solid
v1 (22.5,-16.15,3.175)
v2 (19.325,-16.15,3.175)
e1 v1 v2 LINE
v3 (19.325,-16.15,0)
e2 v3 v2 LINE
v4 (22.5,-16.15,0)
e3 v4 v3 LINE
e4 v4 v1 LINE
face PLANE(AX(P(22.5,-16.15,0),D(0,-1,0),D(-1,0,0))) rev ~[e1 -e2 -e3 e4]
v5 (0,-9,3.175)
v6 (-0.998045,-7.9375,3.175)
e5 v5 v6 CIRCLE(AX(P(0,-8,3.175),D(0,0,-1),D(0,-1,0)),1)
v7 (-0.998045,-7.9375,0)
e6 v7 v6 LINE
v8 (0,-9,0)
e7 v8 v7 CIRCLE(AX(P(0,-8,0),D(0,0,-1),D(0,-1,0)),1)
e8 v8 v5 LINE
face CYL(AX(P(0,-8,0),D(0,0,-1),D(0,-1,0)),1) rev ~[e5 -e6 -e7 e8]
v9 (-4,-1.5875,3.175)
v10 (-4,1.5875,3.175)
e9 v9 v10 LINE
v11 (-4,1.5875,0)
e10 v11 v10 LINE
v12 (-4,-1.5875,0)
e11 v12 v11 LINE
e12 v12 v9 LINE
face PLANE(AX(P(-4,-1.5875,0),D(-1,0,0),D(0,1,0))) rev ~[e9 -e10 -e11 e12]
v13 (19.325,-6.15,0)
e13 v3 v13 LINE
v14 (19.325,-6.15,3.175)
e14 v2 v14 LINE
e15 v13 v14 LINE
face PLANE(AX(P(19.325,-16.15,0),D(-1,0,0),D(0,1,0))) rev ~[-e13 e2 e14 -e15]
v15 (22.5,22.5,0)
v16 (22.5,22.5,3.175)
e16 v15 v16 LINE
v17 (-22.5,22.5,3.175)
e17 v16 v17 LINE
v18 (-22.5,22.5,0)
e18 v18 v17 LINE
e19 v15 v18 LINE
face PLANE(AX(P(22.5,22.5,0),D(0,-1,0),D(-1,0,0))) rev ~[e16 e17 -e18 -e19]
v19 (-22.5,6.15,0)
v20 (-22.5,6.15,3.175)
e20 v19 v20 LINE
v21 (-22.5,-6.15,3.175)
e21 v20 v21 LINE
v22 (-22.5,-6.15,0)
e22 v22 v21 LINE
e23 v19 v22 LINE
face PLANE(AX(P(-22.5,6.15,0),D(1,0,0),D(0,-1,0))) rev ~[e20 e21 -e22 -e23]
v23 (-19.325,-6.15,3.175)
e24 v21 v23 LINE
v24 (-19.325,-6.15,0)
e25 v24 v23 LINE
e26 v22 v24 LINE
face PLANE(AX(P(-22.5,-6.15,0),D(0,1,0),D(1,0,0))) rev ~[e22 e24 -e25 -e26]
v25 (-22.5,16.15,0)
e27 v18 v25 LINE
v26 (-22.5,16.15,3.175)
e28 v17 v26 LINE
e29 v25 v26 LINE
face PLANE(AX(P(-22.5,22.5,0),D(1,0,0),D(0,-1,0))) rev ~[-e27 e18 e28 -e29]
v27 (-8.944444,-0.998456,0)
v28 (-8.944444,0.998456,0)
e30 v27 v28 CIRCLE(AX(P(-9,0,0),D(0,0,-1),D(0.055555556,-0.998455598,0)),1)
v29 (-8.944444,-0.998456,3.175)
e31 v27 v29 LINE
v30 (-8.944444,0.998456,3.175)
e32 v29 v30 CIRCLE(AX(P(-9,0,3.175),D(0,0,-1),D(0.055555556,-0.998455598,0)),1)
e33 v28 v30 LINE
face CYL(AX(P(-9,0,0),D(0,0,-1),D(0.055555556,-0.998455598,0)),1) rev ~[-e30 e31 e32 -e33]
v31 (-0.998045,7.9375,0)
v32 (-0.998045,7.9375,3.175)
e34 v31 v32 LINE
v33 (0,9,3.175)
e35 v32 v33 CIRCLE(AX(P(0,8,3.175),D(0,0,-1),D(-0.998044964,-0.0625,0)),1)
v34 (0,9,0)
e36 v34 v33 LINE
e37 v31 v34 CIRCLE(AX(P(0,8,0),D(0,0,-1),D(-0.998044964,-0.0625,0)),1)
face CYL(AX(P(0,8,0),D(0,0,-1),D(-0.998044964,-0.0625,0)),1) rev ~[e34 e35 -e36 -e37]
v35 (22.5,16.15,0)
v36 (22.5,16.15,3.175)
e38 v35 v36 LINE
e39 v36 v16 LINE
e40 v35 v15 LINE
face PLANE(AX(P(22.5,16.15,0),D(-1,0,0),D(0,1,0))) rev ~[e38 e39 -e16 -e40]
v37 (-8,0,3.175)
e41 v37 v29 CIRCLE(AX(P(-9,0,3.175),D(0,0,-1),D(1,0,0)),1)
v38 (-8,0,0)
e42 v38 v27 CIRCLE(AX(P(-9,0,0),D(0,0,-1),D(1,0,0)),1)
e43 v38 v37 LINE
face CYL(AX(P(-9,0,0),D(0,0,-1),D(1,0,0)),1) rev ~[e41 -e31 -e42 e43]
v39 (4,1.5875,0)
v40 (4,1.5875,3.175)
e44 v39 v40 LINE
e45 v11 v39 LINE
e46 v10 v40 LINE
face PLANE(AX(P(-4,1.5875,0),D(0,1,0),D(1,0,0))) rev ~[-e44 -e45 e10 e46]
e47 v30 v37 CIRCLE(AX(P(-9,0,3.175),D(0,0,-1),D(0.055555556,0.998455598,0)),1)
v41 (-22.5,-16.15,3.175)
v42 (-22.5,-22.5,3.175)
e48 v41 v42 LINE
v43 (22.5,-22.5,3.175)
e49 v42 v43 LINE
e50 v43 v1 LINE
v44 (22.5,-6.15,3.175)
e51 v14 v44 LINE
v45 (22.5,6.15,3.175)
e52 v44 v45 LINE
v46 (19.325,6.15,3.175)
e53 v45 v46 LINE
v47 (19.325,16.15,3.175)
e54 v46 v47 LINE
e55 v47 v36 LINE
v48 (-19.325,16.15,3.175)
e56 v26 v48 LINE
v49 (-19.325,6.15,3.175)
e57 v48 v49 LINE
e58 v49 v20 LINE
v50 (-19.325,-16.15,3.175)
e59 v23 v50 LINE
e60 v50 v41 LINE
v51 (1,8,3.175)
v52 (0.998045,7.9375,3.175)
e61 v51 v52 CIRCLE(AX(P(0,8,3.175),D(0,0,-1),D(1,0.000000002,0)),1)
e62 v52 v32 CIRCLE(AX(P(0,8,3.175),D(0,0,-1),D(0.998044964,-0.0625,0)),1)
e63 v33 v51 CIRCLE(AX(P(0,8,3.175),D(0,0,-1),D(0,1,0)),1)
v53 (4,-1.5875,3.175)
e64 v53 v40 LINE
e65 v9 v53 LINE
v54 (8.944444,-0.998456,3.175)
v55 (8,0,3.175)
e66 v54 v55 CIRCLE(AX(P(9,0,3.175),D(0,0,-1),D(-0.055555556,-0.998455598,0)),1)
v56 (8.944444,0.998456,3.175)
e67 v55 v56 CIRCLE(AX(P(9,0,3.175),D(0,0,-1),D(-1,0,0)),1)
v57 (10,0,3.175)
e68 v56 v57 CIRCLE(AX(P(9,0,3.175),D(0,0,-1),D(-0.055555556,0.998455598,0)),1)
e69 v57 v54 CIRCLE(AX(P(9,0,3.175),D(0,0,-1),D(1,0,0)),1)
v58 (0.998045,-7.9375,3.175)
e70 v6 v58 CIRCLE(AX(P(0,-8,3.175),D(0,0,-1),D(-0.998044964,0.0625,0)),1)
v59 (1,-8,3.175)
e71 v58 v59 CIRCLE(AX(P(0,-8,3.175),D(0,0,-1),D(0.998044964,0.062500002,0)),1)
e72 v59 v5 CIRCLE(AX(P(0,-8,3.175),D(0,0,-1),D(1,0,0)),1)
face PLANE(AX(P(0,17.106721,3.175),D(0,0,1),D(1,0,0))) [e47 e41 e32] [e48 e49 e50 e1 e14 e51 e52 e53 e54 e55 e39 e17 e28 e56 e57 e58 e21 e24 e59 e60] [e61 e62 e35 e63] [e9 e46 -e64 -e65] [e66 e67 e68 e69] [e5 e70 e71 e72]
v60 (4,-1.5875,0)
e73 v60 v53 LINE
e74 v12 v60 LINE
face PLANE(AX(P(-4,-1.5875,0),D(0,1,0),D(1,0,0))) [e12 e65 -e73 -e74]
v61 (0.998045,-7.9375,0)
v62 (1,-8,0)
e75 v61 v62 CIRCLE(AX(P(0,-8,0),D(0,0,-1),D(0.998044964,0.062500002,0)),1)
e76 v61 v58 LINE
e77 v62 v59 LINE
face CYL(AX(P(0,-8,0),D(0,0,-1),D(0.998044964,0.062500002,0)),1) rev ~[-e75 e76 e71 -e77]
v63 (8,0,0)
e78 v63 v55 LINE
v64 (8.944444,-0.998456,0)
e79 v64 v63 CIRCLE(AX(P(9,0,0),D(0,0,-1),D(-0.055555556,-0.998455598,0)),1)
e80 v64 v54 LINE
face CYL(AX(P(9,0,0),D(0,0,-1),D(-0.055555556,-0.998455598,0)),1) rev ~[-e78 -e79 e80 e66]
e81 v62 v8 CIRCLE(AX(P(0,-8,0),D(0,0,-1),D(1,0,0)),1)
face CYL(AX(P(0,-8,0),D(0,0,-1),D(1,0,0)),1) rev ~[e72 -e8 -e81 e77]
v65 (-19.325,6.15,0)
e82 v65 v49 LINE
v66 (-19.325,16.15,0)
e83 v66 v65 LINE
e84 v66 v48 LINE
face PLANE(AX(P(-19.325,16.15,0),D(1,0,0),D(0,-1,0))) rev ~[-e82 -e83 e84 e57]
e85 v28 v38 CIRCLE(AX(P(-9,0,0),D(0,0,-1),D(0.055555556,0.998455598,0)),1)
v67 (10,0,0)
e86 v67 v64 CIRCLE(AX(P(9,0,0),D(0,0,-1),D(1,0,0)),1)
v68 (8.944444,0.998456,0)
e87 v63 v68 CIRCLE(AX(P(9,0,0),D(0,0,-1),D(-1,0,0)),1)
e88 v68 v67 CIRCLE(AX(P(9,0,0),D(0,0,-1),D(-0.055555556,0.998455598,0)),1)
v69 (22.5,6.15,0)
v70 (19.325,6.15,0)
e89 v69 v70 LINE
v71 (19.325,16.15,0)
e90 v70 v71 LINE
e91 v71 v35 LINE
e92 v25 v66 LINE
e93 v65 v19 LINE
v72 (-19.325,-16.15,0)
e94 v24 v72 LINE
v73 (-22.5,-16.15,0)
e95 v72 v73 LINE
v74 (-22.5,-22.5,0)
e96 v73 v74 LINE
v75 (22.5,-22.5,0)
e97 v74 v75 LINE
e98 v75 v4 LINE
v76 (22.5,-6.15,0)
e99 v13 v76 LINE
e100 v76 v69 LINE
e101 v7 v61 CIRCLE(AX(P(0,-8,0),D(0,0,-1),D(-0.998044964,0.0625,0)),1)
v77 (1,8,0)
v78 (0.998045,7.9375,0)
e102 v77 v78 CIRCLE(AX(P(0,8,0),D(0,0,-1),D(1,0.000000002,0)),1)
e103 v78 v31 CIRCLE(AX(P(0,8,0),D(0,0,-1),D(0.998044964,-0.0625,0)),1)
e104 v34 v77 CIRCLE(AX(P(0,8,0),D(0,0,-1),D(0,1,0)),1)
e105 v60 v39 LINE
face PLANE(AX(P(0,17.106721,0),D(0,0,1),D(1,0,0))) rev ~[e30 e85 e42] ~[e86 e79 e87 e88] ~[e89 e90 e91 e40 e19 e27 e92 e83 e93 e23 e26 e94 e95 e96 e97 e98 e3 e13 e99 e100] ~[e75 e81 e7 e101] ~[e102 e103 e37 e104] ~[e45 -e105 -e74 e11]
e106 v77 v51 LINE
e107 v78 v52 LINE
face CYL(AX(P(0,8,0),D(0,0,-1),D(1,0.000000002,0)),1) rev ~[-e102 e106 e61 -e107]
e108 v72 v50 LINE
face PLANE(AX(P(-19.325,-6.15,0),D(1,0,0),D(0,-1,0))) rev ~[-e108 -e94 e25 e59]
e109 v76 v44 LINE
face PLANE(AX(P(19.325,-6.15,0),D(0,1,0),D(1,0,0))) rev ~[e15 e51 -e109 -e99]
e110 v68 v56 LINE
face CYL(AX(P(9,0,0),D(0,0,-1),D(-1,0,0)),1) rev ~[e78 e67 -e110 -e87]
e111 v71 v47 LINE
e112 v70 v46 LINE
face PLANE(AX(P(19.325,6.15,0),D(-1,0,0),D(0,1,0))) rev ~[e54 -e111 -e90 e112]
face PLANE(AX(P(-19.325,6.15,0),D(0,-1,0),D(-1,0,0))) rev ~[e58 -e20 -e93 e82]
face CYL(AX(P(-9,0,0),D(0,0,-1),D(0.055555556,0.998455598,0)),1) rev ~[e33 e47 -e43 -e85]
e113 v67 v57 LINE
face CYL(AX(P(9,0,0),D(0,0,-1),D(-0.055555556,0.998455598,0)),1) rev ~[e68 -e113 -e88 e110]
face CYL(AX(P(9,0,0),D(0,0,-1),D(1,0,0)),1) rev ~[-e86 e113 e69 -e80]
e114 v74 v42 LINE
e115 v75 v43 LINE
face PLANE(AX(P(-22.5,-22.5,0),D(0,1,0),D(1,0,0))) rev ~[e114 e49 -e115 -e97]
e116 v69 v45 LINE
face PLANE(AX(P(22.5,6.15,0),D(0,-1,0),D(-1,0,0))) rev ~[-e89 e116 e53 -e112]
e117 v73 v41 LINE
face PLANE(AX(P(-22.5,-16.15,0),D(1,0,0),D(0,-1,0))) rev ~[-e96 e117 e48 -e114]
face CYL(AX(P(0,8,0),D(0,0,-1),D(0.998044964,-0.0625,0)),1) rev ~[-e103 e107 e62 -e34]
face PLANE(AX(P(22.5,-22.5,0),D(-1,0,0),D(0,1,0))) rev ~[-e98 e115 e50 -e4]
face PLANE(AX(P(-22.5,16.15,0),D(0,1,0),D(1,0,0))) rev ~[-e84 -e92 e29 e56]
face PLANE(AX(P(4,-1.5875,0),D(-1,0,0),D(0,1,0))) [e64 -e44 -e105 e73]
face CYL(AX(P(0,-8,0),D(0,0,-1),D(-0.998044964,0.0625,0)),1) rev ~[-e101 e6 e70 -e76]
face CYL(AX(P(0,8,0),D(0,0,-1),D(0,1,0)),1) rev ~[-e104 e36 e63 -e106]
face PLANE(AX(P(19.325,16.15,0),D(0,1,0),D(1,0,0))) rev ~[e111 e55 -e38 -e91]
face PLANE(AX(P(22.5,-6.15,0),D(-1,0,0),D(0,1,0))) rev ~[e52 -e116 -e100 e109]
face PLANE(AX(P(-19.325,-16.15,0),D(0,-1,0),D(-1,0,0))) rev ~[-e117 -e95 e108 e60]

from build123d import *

# Parameters (mm, degrees)
F0_W     = 8
F0_H     = 3.175
F1_DEPTH = 3.175


# Not quite as in the source:
# - a length typed as a fraction of an inch, garbled in the dataset ("3 / 203.2 mm" for 3/8 in), is restored
# - a feature names something its author has since deleted; it is built from what else it names


with BuildPart() as f1:
    # F0 (on Top) → F1 (new body)
    with BuildSketch(Plane.XY):
        Polygon((-19.325, 11.15), (19.325, 11.15), (19.325, 16.15), (22.5, 16.15), (22.5, 22.5), (-22.5, 22.5), (-22.5, 16.15), (-19.325, 16.15), align=None)
        Polygon((-19.325, -11.15), (19.325, -11.15), (19.325, -6.15), (22.5, -6.15), (22.5, 6.15), (19.325, 6.15), (19.325, 11.15), (-19.325, 11.15), (-19.325, 6.15), (-22.5, 6.15), (-22.5, -6.15), (-19.325, -6.15), align=None)
        with BuildLine():
            ThreePointArc((-8.9444444444, -0.9984555975), (-10, 0), (-8.9444444444, 0.9984555975))
            ThreePointArc((-8.9444444444, 0.9984555975), (-6.000579123, 6.7076859042), (0, 9))
            ThreePointArc((0, 9), (6.000579123, 6.7076859042), (8.9444444444, 0.9984555975))
            ThreePointArc((8.9444444444, 0.9984555975), (9.6871842709, 0.7264831573), (10, 0))
            ThreePointArc((10, 0), (9.6871842709, -0.7264831573), (8.9444444444, -0.9984555975))
            ThreePointArc((8.9444444444, -0.9984555975), (6.000579123, -6.7076859042), (0, -9))
            ThreePointArc((0, -9), (-6.000579123, -6.7076859042), (-8.9444444444, -0.9984555975))
        make_face(mode=Mode.SUBTRACT)
        Polygon((-22.5, -22.5), (22.5, -22.5), (22.5, -16.15), (19.325, -16.15), (19.325, -11.15), (-19.325, -11.15), (-19.325, -16.15), (-22.5, -16.15), align=None)
        with BuildLine():
            ThreePointArc((-0.9980449639, 7.9375), (-5.9993482859, 5.2922415047), (-8, 0))
            ThreePointArc((-8, 0), (-5.9993482859, -5.2922415047), (-0.9980449639, -7.9375))
            ThreePointArc((-0.9980449639, -7.9375), (0, -7), (0.9980449639, -7.9375))
            ThreePointArc((0.9980449639, -7.9375), (5.9993482859, -5.2922415047), (8, 0))
            ThreePointArc((8, 0), (5.9993482859, 5.2922415047), (0.9980449639, 7.9375))
            ThreePointArc((0.9980449639, 7.9375), (0, 7), (-0.9980449639, 7.9375))
        make_face()
        Rectangle(F0_W, F0_H, mode=Mode.SUBTRACT)
        with BuildLine():
            ThreePointArc((-8.9444444444, 0.9984555975), (-8.2735168427, 0.6871842709), (-8, 0))
            ThreePointArc((-8, 0), (-5.9993482859, 5.2922415047), (-0.9980449639, 7.9375))
            ThreePointArc((-0.9980449639, 7.9375), (-0.7288689869, 8.6846531969), (0, 9))
            ThreePointArc((0, 9), (-6.000579123, 6.7076859042), (-8.9444444444, 0.9984555975))
        make_face()
        with BuildLine():
            ThreePointArc((8.9444444444, 0.9984555975), (6.000579123, 6.7076859042), (0, 9))
            ThreePointArc((0, 9), (0.7071067812, 8.7071067812), (1, 8))
            ThreePointArc((1, 8), (0.9995111215, 7.9687347151), (0.9980449639, 7.9375))
            ThreePointArc((0.9980449639, 7.9375), (5.9993482859, 5.2922415047), (8, 0))
            ThreePointArc((8, 0), (8.2735168427, 0.6871842709), (8.9444444444, 0.9984555975))
        make_face()
        with BuildLine():
            ThreePointArc((1, -8), (0.7071067812, -8.7071067812), (0, -9))
            ThreePointArc((0, -9), (6.000579123, -6.7076859042), (8.9444444444, -0.9984555975))
            ThreePointArc((8.9444444444, -0.9984555975), (8.2735168427, -0.6871842709), (8, 0))
            ThreePointArc((8, 0), (5.9993482859, -5.2922415047), (0.9980449639, -7.9375))
            ThreePointArc((0.9980449639, -7.9375), (0.9995111215, -7.9687347151), (1, -8))
        make_face()
        with BuildLine():
            ThreePointArc((-0.9980449639, -7.9375), (-5.9993482859, -5.2922415047), (-8, 0))
            ThreePointArc((-8, 0), (-8.2735168427, -0.6871842709), (-8.9444444444, -0.9984555975))
            ThreePointArc((-8.9444444444, -0.9984555975), (-6.000579123, -6.7076859042), (0, -9))
            ThreePointArc((0, -9), (-0.7288689869, -8.6846531969), (-0.9980449639, -7.9375))
        make_face()
    extrude(amount=F1_DEPTH)


solid = f1.part
